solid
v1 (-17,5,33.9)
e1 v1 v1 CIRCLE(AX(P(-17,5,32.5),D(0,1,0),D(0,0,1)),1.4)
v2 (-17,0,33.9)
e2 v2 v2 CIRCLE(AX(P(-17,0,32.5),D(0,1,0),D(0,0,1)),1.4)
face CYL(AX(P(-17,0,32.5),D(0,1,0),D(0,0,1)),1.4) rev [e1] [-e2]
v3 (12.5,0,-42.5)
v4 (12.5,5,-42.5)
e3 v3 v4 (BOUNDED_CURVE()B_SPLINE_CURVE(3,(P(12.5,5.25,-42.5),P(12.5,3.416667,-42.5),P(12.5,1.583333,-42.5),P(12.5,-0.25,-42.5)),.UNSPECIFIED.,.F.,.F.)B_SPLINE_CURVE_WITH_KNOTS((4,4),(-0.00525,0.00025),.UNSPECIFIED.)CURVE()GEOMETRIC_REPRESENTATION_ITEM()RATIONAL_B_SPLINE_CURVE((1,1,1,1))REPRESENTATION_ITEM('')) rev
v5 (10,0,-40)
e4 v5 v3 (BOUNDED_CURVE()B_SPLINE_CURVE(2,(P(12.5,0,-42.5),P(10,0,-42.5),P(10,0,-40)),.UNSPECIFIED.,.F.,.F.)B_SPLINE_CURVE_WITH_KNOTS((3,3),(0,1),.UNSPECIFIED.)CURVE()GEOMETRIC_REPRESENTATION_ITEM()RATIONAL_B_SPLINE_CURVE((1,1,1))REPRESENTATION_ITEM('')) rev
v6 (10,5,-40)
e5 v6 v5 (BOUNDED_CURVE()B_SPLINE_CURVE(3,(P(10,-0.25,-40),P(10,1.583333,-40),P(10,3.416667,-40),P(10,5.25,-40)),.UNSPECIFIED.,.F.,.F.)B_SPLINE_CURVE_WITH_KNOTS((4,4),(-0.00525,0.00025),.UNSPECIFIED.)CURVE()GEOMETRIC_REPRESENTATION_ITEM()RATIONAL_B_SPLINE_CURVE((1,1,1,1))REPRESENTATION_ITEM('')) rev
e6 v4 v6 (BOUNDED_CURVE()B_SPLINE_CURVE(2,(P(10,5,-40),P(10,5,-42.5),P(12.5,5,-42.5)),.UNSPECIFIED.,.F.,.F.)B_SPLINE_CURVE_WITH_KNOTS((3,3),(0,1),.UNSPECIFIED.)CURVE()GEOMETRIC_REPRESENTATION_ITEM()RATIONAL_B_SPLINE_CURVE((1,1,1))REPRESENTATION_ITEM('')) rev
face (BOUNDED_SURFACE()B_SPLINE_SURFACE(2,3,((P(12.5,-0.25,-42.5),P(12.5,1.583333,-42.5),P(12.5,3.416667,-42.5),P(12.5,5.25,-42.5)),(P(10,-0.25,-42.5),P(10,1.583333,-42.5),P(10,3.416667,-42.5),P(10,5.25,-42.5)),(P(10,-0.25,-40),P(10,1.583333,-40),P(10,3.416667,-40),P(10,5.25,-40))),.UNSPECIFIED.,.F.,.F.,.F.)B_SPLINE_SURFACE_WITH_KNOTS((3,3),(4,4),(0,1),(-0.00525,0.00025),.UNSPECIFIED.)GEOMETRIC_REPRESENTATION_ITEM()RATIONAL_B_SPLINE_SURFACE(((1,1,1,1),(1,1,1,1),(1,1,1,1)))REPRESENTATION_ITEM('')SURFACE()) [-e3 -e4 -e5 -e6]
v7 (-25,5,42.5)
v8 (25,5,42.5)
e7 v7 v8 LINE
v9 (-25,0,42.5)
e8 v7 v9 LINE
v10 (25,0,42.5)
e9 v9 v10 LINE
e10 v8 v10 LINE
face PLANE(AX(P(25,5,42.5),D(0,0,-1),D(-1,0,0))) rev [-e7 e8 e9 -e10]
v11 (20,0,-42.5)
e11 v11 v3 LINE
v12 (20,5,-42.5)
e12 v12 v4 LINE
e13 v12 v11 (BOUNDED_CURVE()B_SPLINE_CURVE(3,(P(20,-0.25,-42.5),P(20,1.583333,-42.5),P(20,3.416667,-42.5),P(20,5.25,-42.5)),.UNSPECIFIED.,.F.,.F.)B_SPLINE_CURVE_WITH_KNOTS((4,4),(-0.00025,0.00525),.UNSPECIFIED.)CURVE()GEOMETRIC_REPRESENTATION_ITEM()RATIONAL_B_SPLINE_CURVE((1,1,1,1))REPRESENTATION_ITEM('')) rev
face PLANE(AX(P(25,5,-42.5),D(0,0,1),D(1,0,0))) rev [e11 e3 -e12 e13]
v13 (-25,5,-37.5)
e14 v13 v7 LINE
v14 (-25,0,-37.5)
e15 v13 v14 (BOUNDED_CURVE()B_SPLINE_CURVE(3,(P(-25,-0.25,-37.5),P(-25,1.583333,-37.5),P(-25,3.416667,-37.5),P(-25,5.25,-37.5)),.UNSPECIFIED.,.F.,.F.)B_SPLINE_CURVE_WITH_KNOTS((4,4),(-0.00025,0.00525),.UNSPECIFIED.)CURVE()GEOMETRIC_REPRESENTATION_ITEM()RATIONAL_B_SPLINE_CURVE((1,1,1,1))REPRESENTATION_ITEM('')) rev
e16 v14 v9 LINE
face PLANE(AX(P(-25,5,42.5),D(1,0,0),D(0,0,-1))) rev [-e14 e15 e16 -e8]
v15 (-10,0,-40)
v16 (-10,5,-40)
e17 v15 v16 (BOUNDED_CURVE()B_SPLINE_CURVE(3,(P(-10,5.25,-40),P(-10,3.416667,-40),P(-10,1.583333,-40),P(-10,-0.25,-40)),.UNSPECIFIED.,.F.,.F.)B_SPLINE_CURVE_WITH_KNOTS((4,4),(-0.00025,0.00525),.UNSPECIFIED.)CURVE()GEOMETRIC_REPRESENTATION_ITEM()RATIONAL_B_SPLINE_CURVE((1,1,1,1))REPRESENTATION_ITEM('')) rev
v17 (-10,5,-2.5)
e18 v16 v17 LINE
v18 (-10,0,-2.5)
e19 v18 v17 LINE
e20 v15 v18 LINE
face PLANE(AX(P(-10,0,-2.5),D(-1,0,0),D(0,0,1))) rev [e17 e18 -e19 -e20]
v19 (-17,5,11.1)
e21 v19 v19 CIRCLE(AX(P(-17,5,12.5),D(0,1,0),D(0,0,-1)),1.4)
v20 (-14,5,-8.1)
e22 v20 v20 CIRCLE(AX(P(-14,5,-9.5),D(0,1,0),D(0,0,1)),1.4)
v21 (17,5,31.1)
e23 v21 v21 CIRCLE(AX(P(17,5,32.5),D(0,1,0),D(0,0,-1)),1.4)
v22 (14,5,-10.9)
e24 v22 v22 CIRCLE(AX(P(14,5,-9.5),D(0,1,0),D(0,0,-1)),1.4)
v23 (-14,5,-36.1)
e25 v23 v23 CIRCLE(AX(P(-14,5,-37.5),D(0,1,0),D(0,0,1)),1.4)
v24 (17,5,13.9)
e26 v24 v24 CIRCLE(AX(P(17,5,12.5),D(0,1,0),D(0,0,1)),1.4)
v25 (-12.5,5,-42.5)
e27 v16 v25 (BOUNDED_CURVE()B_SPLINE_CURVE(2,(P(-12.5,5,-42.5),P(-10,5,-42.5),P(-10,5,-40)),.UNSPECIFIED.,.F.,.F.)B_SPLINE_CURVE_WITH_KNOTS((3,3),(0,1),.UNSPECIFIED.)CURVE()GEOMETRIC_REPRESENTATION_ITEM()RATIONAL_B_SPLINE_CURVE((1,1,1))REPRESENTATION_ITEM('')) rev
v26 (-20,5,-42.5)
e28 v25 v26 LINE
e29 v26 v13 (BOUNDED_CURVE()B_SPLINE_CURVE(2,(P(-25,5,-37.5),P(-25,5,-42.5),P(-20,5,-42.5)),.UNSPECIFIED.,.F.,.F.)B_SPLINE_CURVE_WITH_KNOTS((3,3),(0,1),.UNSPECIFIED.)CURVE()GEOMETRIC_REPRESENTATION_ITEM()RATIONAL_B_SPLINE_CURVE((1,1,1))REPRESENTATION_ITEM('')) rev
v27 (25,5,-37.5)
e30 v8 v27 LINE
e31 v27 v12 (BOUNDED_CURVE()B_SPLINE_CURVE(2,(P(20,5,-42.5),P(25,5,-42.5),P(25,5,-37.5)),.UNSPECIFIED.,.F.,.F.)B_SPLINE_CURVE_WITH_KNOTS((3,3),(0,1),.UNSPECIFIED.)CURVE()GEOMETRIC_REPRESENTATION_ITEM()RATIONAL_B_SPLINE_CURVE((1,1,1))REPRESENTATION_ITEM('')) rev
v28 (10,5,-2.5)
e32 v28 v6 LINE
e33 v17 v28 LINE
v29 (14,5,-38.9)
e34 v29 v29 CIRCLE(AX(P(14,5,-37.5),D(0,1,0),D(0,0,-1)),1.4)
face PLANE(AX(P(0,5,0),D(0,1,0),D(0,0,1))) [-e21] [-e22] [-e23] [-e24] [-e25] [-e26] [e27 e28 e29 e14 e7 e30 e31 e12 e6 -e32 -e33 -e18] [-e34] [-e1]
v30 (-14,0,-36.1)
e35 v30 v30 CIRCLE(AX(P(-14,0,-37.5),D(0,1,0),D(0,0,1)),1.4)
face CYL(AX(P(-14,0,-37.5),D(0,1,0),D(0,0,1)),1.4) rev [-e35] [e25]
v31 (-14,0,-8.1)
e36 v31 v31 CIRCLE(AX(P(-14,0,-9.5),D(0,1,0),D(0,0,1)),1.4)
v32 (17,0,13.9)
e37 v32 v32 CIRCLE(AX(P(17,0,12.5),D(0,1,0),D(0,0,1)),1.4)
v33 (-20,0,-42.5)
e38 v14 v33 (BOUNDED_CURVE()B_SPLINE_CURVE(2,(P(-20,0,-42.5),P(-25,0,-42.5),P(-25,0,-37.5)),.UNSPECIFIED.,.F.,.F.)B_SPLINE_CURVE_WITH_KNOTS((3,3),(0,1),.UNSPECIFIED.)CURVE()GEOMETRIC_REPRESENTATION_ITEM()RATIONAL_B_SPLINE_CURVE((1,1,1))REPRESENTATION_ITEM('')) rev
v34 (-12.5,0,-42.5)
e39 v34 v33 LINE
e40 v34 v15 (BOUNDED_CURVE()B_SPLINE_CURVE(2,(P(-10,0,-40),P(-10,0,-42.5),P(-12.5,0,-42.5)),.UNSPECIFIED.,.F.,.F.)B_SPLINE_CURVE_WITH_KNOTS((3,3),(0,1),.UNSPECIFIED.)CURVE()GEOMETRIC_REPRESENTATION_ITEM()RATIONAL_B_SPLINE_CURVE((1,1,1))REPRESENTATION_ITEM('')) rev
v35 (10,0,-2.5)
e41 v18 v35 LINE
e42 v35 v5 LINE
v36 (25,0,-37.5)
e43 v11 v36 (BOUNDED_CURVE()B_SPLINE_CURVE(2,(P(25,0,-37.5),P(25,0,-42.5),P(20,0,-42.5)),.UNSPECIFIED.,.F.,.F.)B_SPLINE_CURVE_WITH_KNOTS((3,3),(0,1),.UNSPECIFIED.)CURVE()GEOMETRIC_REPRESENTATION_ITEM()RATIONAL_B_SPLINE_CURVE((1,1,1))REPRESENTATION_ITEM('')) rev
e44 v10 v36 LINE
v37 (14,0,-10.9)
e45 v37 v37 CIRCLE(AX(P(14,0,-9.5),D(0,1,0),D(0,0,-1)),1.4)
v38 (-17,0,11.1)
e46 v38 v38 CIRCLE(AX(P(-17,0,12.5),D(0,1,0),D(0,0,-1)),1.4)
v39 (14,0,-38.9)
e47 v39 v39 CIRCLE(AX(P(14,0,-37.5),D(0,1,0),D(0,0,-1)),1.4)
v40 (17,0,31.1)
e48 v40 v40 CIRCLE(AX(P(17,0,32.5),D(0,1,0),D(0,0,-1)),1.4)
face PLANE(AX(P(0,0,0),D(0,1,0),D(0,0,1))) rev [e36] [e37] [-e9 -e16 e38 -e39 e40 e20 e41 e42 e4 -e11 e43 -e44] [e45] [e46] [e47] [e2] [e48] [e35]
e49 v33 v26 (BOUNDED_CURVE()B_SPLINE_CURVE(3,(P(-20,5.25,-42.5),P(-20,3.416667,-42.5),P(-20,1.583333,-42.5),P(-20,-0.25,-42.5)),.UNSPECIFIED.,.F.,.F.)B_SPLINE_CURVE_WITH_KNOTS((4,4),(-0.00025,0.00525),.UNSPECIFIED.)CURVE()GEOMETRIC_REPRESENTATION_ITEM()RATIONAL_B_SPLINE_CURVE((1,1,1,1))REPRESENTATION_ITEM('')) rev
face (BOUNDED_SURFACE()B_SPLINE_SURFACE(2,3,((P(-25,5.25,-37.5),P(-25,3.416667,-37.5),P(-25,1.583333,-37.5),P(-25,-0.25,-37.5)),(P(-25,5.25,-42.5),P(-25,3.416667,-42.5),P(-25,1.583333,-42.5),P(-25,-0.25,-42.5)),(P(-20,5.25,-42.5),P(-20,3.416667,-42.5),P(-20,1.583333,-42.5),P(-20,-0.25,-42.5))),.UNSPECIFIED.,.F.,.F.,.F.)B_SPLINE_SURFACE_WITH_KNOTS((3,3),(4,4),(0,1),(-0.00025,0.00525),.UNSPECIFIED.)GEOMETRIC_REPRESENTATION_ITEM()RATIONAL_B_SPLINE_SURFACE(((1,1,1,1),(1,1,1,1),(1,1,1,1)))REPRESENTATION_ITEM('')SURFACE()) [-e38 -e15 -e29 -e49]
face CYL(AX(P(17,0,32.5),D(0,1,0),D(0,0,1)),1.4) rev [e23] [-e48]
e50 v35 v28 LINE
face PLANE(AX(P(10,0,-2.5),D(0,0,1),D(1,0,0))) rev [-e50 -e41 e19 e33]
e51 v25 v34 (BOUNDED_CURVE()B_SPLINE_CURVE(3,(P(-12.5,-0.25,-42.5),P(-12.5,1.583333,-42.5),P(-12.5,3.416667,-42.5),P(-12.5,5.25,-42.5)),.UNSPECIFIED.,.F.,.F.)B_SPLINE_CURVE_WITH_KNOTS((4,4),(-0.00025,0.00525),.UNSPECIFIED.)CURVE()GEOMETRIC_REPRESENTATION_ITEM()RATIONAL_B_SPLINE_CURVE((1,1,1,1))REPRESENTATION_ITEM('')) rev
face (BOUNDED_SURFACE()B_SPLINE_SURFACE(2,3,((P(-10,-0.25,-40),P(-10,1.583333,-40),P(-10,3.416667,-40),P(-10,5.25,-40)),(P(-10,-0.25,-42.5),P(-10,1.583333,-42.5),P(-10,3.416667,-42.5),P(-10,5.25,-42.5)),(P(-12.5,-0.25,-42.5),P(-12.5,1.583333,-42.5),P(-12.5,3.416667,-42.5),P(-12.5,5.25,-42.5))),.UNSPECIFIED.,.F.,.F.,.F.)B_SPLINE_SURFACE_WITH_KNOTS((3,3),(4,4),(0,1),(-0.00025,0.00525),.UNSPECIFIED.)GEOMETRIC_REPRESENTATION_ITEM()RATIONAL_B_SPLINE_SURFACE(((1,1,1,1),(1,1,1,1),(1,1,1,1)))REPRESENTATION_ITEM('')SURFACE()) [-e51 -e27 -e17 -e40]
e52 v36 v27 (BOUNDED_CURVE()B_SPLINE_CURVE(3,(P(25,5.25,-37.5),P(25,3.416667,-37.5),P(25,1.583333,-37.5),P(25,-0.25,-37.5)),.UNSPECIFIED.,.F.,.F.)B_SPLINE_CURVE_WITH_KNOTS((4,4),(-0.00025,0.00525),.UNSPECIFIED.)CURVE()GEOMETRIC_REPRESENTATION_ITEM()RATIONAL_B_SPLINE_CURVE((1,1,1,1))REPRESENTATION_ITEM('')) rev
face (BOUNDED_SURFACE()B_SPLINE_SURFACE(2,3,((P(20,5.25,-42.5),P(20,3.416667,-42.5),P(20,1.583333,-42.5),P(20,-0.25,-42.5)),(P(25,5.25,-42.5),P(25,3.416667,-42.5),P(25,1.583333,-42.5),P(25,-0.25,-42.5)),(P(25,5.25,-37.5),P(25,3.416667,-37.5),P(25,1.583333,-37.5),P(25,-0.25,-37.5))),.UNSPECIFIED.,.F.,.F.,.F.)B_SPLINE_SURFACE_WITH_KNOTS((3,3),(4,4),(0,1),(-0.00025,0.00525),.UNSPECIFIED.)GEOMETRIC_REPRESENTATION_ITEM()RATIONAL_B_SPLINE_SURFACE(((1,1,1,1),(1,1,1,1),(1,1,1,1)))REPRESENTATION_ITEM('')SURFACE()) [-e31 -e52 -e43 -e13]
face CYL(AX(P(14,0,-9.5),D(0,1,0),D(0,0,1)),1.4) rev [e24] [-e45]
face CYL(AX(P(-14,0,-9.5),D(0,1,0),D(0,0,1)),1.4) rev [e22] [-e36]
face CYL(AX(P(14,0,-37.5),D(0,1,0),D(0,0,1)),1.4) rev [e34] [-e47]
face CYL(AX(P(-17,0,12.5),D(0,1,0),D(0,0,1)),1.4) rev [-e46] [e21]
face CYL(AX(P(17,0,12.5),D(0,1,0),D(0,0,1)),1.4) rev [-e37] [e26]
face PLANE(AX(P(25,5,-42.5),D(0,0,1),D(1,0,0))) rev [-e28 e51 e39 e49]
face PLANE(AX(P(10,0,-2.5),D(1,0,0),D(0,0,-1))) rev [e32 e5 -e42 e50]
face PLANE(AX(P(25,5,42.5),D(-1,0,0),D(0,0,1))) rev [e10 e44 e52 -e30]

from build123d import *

# Parameters (mm, degrees)
SKETCH1_W           = 50
SKETCH1_H           = 85
BOSS_EXTRUDE1_DEPTH = 5
SKETCH2_R           = 1.4
CUT_EXTRUDE1_DEPTH  = 5
SKETCH3_W           = 20
SKETCH3_H           = 40
CUT_EXTRUDE2_DEPTH  = 5
FILLET3_SIZE        = 5
FILLET4_SIZE        = 5
FILLET5_SIZE        = 2.5
FILLET6_SIZE        = 2.5
SKETCH4_R           = 1.4
CUT_EXTRUDE3_DEPTH  = 5


with BuildPart() as part:
    # Sketch1 → Boss-Extrude1 (new body)
    with BuildSketch(Plane(origin=(0, 0, 0), x_dir=(1, 0, 0), z_dir=(0, 1, 0))):
        Rectangle(SKETCH1_W, SKETCH1_H)
    extrude(amount=BOSS_EXTRUDE1_DEPTH)

    # Sketch2 → Cut-Extrude1 (cut)
    with BuildSketch(Plane(origin=(0, 5, 0), x_dir=(1, 0, 0), z_dir=(0, 1, 0))):
        with Locations(Location((-14, 37.5, 0), (0, 0, 270))):
            Circle(SKETCH2_R)
        with Locations(Location((14, 37.5, 0), (0, 0, 90))):
            Circle(SKETCH2_R)
        with Locations(Location((-14, 9.5, 0), (0, 0, 270))):
            Circle(SKETCH2_R)
        with Locations(Location((14, 9.5, 0), (0, 0, 90))):
            Circle(SKETCH2_R)
    extrude(amount=-CUT_EXTRUDE1_DEPTH, mode=Mode.SUBTRACT)

    # Sketch3 → Cut-Extrude2 (cut)
    with BuildSketch(Plane(origin=(0, 5, 0), x_dir=(1, 0, 0), z_dir=(0, 1, 0))):
        with Locations((0, 22.5)):
            Rectangle(SKETCH3_W, SKETCH3_H)
    extrude(amount=-CUT_EXTRUDE2_DEPTH, mode=Mode.SUBTRACT)

    # Fillet3
    # a fillet whose section is not a circle: 5 mm, written as the material it takes off along each edge
    with BuildSketch(Plane(origin=(-25, -12.5, -42.5), x_dir=(0, 0, 1), z_dir=(0, 1, 0))) as fillet3_piece_1:
        with BuildLine():
            Bezier((FILLET3_SIZE, 0), (0, 0), (0, FILLET3_SIZE), weights=[1, 1, 1])
            Line((0, FILLET3_SIZE), (0, 0))
            Line((0, 0), (FILLET3_SIZE, 0))
        make_face()
    extrude(amount=30, mode=Mode.SUBTRACT)

    # Fillet4
    # a fillet whose section is not a circle: 5 mm, written as the material it takes off along each edge
    with BuildSketch(Plane(origin=(25, -12.5, -42.5), x_dir=(0, 0, 1), z_dir=(0, 1, 0))) as fillet4_piece_1:
        with BuildLine():
            Bezier((FILLET4_SIZE, 0), (0, 0), (0, -FILLET4_SIZE), weights=[1, 1, 1])
            Line((0, -FILLET4_SIZE), (0, 0))
            Line((0, 0), (FILLET4_SIZE, 0))
        make_face()
    extrude(amount=30, mode=Mode.SUBTRACT)

    # Fillet5
    # a fillet whose section is not a circle: 2.5 mm, written as the material it takes off along each edge
    with BuildSketch(Plane(origin=(-10, 11.25, -42.5), x_dir=(0, 0, 1), z_dir=(0, -1, 0))) as fillet5_piece_1:
        with BuildLine():
            Bezier((FILLET5_SIZE, 0), (0, 0), (0, FILLET5_SIZE), weights=[1, 1, 1])
            Line((0, FILLET5_SIZE), (0, 0))
            Line((0, 0), (FILLET5_SIZE, 0))
        make_face()
    extrude(amount=17.5, mode=Mode.SUBTRACT)

    # Fillet6
    # a fillet whose section is not a circle: 2.5 mm, written as the material it takes off along each edge
    with BuildSketch(Plane(origin=(10, 11.25, -42.5), x_dir=(0, 0, 1), z_dir=(0, -1, 0))) as fillet6_piece_1:
        with BuildLine():
            Bezier((FILLET6_SIZE, 0), (0, 0), (0, -FILLET6_SIZE), weights=[1, 1, 1])
            Line((0, -FILLET6_SIZE), (0, 0))
            Line((0, 0), (FILLET6_SIZE, 0))
        make_face()
    extrude(amount=17.5, mode=Mode.SUBTRACT)

    # Sketch4 → Cut-Extrude3 (cut)
    with BuildSketch(Plane(origin=(0, 5, 0), x_dir=(1, 0, 0), z_dir=(0, 1, 0))):
        with Locations(Location((-17, -32.5, 0), (0, 0, 270))):
            Circle(SKETCH4_R)
        with Locations(Location((17, -32.5, 0), (0, 0, 90))):
            Circle(SKETCH4_R)
        with Locations(Location((17, -12.5, 0), (0, 0, 270))):
            Circle(SKETCH4_R)
        with Locations(Location((-17, -12.5, 0), (0, 0, 90))):
            Circle(SKETCH4_R)
    extrude(amount=-CUT_EXTRUDE3_DEPTH, mode=Mode.SUBTRACT)


solid = part.part
